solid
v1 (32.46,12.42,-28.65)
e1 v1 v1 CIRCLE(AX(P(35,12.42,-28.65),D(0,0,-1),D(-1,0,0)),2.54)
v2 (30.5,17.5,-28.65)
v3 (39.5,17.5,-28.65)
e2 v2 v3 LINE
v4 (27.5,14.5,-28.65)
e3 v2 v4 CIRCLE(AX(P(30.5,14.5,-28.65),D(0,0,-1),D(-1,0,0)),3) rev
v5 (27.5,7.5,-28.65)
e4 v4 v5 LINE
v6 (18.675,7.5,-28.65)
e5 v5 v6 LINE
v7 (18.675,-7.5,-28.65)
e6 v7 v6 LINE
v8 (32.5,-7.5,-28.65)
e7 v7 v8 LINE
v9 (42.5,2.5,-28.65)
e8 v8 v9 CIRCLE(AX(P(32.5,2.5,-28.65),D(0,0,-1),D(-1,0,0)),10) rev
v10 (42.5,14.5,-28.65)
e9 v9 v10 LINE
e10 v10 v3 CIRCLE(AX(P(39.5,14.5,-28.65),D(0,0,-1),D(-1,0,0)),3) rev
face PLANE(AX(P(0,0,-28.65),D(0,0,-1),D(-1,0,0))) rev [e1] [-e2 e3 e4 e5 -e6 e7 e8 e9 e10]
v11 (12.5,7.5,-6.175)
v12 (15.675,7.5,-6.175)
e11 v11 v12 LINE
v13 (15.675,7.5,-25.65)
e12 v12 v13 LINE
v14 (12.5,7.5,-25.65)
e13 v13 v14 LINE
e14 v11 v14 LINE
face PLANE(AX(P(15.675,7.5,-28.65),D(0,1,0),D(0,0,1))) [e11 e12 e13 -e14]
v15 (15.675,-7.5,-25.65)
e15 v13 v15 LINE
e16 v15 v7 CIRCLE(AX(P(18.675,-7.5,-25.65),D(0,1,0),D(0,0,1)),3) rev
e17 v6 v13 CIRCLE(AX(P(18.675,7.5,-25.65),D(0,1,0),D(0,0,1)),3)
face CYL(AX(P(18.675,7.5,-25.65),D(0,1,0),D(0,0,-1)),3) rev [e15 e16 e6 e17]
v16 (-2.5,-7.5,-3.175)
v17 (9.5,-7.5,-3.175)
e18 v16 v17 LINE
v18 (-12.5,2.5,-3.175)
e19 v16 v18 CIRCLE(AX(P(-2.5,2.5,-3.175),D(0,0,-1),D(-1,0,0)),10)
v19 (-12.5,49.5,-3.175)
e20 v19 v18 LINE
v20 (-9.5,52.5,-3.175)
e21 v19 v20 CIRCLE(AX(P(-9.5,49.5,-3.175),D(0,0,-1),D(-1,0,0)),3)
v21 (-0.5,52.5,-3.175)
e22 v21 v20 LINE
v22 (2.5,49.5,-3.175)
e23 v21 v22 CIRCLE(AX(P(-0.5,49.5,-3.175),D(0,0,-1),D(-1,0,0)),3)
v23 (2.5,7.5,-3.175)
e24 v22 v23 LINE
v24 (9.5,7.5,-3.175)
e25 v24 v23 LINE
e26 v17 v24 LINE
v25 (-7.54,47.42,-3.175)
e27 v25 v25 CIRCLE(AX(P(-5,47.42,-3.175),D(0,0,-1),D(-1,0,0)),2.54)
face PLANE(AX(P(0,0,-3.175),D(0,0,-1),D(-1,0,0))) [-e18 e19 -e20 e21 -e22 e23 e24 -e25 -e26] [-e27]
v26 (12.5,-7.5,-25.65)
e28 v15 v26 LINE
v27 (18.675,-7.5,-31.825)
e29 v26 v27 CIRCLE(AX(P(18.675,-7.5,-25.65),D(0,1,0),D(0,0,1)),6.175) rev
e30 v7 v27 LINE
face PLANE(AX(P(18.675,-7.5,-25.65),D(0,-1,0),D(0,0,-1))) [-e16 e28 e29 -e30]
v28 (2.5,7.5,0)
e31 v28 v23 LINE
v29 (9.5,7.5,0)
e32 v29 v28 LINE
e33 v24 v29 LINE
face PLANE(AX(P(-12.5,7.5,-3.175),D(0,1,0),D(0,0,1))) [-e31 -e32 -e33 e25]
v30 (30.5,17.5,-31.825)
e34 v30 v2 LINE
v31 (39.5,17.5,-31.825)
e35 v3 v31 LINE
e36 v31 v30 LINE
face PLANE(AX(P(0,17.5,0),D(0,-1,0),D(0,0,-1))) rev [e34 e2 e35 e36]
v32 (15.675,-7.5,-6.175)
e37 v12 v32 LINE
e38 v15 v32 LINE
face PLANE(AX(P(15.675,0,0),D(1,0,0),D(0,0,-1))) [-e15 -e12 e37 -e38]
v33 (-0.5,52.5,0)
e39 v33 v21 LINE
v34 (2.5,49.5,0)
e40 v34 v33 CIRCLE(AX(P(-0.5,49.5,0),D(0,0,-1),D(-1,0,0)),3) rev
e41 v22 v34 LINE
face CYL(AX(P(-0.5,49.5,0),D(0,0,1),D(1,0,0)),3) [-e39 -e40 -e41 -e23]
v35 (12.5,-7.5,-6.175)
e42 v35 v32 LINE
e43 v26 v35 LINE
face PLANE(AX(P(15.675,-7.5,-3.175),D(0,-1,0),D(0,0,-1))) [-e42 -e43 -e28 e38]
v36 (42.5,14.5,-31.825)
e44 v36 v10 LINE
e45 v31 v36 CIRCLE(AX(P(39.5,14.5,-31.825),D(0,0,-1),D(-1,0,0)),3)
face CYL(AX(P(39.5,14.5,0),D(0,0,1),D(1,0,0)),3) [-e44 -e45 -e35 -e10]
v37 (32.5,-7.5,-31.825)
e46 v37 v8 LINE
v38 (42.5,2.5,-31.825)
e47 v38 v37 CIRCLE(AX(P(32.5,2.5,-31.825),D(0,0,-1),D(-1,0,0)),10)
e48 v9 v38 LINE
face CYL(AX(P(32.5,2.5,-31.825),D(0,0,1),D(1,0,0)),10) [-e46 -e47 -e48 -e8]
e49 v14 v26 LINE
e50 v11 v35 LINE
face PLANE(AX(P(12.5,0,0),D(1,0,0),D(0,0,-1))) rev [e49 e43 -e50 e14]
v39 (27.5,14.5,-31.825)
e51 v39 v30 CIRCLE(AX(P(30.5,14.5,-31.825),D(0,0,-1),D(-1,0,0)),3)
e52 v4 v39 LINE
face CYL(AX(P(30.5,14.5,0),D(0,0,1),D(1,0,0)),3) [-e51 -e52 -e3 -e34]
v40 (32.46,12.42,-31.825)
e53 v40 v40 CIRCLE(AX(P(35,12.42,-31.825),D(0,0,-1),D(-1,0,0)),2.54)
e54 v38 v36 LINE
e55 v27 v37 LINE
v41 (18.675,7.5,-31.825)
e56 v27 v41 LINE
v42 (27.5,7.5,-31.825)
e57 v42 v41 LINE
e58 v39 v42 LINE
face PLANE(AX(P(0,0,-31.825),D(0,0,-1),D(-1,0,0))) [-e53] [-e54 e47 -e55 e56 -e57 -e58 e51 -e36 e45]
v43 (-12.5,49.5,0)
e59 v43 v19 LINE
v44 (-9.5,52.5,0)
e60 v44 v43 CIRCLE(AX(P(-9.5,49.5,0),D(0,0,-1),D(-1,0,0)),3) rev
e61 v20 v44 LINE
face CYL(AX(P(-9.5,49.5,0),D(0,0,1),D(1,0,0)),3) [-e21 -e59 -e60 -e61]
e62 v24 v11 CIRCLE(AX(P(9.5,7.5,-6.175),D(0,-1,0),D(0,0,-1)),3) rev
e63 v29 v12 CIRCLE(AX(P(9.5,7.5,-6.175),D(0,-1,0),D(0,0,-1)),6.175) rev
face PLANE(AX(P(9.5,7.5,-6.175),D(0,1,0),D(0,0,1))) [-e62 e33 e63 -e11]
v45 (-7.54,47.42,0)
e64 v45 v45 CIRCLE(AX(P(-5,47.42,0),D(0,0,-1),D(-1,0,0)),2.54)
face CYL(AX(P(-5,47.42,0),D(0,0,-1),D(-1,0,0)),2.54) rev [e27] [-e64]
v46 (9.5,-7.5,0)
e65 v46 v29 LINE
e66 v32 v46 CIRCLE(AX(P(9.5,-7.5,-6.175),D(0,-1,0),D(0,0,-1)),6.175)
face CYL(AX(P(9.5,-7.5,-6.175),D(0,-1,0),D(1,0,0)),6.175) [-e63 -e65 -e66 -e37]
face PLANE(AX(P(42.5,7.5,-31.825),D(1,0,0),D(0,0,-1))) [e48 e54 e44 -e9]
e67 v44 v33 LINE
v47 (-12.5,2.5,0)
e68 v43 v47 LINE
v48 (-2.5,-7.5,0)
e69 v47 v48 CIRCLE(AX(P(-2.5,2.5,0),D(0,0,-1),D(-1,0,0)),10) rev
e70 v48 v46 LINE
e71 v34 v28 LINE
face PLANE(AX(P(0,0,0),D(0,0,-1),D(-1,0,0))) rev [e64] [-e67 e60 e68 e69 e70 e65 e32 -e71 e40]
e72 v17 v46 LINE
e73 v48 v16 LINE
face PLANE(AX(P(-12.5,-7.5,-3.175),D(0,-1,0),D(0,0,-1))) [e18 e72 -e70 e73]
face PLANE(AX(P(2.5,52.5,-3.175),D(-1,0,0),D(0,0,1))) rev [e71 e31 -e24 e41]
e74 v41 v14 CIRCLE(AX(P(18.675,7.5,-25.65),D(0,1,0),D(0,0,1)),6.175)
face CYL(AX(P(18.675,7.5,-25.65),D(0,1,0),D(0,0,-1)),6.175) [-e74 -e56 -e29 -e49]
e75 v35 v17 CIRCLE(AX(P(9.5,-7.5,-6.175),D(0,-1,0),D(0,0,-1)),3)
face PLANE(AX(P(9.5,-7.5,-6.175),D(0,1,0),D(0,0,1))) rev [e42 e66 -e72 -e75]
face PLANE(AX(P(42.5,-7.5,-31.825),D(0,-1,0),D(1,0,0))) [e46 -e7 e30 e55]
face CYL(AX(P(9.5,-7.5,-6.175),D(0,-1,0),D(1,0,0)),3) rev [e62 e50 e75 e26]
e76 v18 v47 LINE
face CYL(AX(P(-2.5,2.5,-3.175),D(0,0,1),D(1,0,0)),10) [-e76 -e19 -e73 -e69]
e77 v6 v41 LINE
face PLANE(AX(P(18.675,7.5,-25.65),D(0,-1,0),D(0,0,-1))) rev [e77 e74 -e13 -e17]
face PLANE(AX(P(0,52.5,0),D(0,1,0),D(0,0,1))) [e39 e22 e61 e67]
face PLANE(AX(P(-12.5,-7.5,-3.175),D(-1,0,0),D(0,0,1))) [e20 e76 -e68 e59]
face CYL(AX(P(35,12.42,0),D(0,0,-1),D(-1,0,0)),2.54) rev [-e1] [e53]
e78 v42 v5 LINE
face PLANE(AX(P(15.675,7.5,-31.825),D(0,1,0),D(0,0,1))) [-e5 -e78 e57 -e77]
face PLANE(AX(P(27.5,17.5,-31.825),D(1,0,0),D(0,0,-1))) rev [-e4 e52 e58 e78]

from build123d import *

# Parameters (mm, degrees)
SKETCH1_W                    = 25
SKETCH1_H                    = 15
BASE_FLANGE1_DEPTH           = 3.175
EDGE_FLANGE1_STRIP_W         = 18.7
EDGE_FLANGE1_STRIP_H         = 3.175
EDGE_FLANGE1_STRIP_CUT_DEPTH = 15
EDGE_FLANGE1_DEPTH           = 15
EDGE_FLANGE2_STRIP_W         = 18.7
EDGE_FLANGE2_STRIP_H         = 3.175
EDGE_FLANGE2_STRIP_CUT_DEPTH = 15
EDGE_FLANGE2_DEPTH           = 15
SKETCH12_W                   = 15
SKETCH12_H                   = 3.175
BOSS_EXTRUDE1_DEPTH          = 45
SKETCH15_R                   = 2.54
CUT_EXTRUDE2_DEPTH           = 74.371128518
SKETCH19_W                   = 15
SKETCH19_H                   = 3.175
BOSS_EXTRUDE2_DEPTH          = 10
SKETCH21_R                   = 2.54
CUT_EXTRUDE3_DEPTH           = 75.668136611
FILLET2_R                    = 3
FILLET3_R                    = 10


# Sheet-metal steps are written as plain solids
with BuildPart() as part:
    # Sketch1 → Base-Flange1 (new body)
    with BuildSketch(Plane.XY):
        Rectangle(SKETCH1_W, SKETCH1_H)
    extrude(amount=-BASE_FLANGE1_DEPTH)

    # Edge-Flange1 strip (across the edge) → Edge-Flange1 strip cut (cut)
    with BuildSketch(Plane(origin=(12.5, 7.5, -3.175), x_dir=(-1, 0, 0), z_dir=(0, -1, 0))):
        with Locations((-6.35, -1.5875)):
            Rectangle(EDGE_FLANGE1_STRIP_W, EDGE_FLANGE1_STRIP_H)
    extrude(amount=EDGE_FLANGE1_STRIP_CUT_DEPTH, mode=Mode.SUBTRACT)

    # Edge-Flange1 section (across the edge) → Edge-Flange1 (add)
    with BuildSketch(Plane(origin=(12.5, 7.5, -3.175), x_dir=(-1, 0, 0), z_dir=(0, -1, 0))):
        with BuildLine():
            Line((-3.175, 3), (-3.175, 25.475))
            Line((-3.175, 25.475), (0, 25.475))
            Line((0, 25.475), (0, 3))
            ThreePointArc((0, 3), (0.878679656, 0.878679656), (3, 0))
            Line((3, 0), (3, -3.175))
            ThreePointArc((3, -3.175), (-1.366384374, -1.366384374), (-3.175, 3))
        make_face()
    extrude(amount=EDGE_FLANGE1_DEPTH)

    # Edge-Flange2 strip (across the edge) → Edge-Flange2 strip cut (cut)
    with BuildSketch(Plane(origin=(15.675, -7.5, -28.65), x_dir=(0, 0, 1), z_dir=(0, 1, 0))):
        with Locations((-6.35, -1.5875)):
            Rectangle(EDGE_FLANGE2_STRIP_W, EDGE_FLANGE2_STRIP_H)
    extrude(amount=EDGE_FLANGE2_STRIP_CUT_DEPTH, mode=Mode.SUBTRACT)

    # Edge-Flange2 section (across the edge) → Edge-Flange2 (add)
    with BuildSketch(Plane(origin=(15.675, -7.5, -28.65), x_dir=(0, 0, 1), z_dir=(0, 1, 0))):
        with BuildLine():
            Line((-3.175, 3), (-3.175, 26.825))
            Line((-3.175, 26.825), (0, 26.825))
            Line((0, 26.825), (0, 3))
            ThreePointArc((0, 3), (0.878679656, 0.878679656), (3, 0))
            Line((3, 0), (3, -3.175))
            ThreePointArc((3, -3.175), (-1.366384374, -1.366384374), (-3.175, 3))
        make_face()
    extrude(amount=EDGE_FLANGE2_DEPTH)

    # Sketch12 → Boss-Extrude1 (add)
    with BuildSketch(Plane(origin=(0, 7.5, 0), x_dir=(1, 0, 0), z_dir=(0, 1, 0))):
        with Locations((-5, 1.5875)):
            Rectangle(SKETCH12_W, SKETCH12_H)
    extrude(amount=BOSS_EXTRUDE1_DEPTH)

    # Sketch15 → Cut-Extrude2 (cut, through all)
    with BuildSketch(Plane(origin=(0, 0, -3.175), x_dir=(-1, 0, 0), z_dir=(0, 0, -1))):
        with Locations((5, 47.42)):
            Circle(SKETCH15_R)
    extrude(amount=-CUT_EXTRUDE2_DEPTH, mode=Mode.SUBTRACT)

    # Sketch19 → Boss-Extrude2 (add)
    with BuildSketch(Plane(origin=(0, 7.5, 0), x_dir=(1, 0, 0), z_dir=(0, 1, 0))):
        with Locations((35, 30.2375)):
            Rectangle(SKETCH19_W, SKETCH19_H)
    extrude(amount=BOSS_EXTRUDE2_DEPTH)

    # Sketch21 → Cut-Extrude3 (cut, through all)
    with BuildSketch(Plane(origin=(0, 0, -31.825), x_dir=(-1, 0, 0), z_dir=(0, 0, -1))):
        with Locations((-35, 12.42)):
            Circle(SKETCH21_R)
    extrude(amount=-CUT_EXTRUDE3_DEPTH, mode=Mode.SUBTRACT)

    # Fillet2
    fillet2_edges = [part.edges().sort_by_distance(p)[0] for p in [
        (42.5, 17.5, -30.2375),
        (27.5, 17.5, -30.2375),
        (-12.5, 52.5, -1.5875),
        (2.5, 52.5, -1.5875),
    ]]
    fillet(fillet2_edges, radius=FILLET2_R)

    # Fillet3
    fillet3_edges = [part.edges().sort_by_distance(p)[0] for p in [
        (42.5, -7.5, -30.2375),
        (-12.5, -7.5, -1.5875),
    ]]
    fillet(fillet3_edges, radius=FILLET3_R)


solid = part.part
